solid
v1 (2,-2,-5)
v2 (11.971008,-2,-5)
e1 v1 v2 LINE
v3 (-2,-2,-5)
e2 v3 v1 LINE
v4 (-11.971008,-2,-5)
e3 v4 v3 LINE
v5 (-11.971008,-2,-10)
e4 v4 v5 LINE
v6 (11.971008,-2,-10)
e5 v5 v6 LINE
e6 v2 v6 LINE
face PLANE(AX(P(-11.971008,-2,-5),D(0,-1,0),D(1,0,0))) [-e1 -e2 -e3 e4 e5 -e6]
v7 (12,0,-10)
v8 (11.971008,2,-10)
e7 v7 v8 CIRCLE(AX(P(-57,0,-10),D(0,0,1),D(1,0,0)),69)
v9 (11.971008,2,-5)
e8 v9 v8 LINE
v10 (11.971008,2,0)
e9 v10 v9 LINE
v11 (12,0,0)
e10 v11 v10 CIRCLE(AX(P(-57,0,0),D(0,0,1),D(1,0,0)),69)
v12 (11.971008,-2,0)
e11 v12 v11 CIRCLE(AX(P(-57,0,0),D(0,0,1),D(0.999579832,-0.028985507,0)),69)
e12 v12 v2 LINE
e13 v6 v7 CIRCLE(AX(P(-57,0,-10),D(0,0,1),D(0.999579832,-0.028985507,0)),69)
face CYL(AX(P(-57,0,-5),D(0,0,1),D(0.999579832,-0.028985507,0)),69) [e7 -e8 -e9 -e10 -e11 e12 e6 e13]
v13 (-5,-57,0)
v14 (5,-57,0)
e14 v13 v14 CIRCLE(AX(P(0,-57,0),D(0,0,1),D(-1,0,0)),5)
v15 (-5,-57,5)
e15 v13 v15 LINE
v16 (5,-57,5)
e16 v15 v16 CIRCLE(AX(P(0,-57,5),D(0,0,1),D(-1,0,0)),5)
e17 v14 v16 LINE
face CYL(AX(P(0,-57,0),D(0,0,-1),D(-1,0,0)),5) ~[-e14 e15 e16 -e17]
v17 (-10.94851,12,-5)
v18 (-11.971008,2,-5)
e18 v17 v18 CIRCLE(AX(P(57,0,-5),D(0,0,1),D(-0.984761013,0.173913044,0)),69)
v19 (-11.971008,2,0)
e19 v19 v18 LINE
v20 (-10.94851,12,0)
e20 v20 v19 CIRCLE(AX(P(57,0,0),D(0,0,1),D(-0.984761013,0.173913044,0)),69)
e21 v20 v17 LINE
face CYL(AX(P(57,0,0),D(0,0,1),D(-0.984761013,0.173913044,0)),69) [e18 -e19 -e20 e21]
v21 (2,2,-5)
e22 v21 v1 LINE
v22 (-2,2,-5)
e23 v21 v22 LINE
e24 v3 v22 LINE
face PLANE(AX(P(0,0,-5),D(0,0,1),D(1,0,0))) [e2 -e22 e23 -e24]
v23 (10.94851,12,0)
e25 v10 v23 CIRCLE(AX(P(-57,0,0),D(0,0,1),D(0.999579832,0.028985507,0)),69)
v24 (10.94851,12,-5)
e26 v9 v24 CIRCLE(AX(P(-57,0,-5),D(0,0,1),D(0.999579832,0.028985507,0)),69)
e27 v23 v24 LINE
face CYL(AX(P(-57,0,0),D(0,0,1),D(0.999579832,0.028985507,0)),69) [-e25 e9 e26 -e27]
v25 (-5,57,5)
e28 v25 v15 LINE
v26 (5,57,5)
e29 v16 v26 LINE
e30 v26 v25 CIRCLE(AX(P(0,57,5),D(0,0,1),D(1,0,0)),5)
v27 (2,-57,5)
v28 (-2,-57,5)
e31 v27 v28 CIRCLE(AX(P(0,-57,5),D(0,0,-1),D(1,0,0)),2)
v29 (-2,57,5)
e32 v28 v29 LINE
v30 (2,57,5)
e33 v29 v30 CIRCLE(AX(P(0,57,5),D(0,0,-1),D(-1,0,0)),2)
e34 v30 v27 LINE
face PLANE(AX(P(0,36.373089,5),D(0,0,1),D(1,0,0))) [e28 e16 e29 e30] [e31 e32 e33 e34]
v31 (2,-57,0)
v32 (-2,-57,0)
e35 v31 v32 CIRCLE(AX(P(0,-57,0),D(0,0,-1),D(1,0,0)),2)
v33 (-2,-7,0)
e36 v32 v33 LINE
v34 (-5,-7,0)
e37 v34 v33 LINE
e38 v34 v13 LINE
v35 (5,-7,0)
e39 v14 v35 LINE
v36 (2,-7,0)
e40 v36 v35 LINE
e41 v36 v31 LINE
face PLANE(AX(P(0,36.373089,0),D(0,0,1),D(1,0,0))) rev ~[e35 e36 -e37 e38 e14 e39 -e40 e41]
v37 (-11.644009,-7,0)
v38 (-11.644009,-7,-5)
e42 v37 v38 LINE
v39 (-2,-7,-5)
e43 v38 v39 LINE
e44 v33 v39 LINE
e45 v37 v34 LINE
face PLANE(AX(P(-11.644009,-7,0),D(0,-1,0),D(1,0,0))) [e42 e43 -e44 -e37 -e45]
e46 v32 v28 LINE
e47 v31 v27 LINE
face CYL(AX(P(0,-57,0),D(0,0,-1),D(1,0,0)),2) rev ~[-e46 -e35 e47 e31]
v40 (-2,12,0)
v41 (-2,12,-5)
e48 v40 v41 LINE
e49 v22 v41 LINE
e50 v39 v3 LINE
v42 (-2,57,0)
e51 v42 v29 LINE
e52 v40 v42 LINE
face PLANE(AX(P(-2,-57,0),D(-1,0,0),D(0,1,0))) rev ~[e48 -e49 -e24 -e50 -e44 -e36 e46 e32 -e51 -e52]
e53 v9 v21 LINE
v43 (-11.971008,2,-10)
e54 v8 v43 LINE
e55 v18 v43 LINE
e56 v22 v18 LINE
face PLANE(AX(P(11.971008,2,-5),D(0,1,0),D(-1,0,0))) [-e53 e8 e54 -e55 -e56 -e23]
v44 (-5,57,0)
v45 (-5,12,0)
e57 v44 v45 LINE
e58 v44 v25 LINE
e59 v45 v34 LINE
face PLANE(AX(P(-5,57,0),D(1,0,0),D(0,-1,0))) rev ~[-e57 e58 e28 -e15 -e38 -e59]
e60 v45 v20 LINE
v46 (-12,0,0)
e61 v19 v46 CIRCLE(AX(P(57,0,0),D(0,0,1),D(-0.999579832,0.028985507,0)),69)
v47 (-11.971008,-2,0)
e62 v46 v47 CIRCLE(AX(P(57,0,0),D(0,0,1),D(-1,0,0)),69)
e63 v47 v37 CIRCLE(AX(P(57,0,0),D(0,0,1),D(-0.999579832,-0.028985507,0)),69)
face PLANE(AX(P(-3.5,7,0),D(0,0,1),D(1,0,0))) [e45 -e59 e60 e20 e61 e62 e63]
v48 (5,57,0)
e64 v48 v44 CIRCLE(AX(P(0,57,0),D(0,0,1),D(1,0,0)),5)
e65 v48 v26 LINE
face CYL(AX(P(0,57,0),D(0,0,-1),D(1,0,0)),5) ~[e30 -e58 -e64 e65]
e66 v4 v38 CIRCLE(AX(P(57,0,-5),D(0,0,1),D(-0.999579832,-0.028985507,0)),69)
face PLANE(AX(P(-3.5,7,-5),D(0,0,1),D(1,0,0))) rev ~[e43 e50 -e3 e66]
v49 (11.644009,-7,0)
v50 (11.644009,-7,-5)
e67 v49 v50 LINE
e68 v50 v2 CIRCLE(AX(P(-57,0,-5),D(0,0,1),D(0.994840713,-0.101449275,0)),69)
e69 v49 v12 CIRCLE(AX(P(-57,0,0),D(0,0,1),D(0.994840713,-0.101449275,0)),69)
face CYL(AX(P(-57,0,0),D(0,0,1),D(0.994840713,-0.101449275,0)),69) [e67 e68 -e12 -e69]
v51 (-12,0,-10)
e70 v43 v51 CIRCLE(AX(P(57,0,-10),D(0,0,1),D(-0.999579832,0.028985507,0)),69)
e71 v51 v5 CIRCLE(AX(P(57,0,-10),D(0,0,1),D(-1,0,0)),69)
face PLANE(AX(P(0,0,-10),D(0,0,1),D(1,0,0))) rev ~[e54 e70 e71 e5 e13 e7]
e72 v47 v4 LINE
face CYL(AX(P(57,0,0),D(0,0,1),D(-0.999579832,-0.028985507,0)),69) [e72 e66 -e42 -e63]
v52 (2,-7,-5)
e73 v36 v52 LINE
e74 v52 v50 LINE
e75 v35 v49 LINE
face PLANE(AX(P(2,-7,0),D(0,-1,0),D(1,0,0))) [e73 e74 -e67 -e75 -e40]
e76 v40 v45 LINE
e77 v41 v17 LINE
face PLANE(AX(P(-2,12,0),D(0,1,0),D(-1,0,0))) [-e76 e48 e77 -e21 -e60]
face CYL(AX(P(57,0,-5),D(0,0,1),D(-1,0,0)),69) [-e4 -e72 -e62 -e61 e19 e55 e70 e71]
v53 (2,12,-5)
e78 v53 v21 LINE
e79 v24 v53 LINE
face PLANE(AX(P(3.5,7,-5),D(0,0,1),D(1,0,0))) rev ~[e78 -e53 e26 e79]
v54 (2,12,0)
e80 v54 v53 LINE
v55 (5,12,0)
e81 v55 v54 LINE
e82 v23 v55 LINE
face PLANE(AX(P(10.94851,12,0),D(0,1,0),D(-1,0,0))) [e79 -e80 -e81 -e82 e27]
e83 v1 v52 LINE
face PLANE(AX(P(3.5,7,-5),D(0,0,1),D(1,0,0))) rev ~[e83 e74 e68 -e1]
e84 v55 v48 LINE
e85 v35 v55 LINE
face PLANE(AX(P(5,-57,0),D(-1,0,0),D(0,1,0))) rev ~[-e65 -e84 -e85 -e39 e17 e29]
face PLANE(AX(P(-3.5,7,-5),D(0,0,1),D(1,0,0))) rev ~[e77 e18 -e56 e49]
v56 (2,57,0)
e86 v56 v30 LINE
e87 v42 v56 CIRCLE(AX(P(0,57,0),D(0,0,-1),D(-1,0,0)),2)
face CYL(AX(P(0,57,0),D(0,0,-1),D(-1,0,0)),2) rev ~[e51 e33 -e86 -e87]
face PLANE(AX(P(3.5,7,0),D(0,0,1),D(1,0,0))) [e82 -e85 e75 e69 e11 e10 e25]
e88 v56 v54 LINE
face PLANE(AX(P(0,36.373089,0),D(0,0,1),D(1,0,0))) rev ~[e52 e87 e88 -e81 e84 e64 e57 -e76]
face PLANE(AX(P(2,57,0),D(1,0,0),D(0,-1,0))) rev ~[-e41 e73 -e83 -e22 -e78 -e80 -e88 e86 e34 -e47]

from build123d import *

# Parameters (mm, degrees)
F0_W     = 3
F0_H     = 10
F0_H_2   = 5
F1_DEPTH = 5
F2_START = -5
F2_DEPTH = 5
F3_DEPTH = 5


with BuildPart() as f1:
    # F0 (on Top) → F1 (new body)
    with BuildSketch(Plane.XY):
        with Locations((3.5, 7)):
            Rectangle(F0_W, F0_H)
        with BuildLine():
            Line((10.9485099174, 12), (5, 12))
            Line((5, 12), (5, 2))
            Line((5, 2), (11.9710084021, 2))
            ThreePointArc((11.9710084021, 2), (11.6421053306, 7.0186448683), (10.9485099174, 12))
        make_face()
        Polygon((5, 2), (2, 2), (2, -2), (5, -2), (5, 0), align=None)
        with BuildLine():
            Line((11.9710084021, 2), (5, 2))
            Line((5, 2), (5, 0))
            Line((5, 0), (5, -2))
            Line((5, -2), (11.9710084021, -2))
            ThreePointArc((11.9710084021, -2), (11.9927517198, -1.0001050586), (12, 0))
            ThreePointArc((12, 0), (11.9927517198, 1.0001050586), (11.9710084021, 2))
        make_face()
        with Locations((3.5, -4.5)):
            Rectangle(F0_W, F0_H_2)
        with BuildLine():
            Line((11.9710084021, -2), (5, -2))
            Line((5, -2), (5, -7))
            Line((5, -7), (11.6440092069, -7))
            ThreePointArc((11.6440092069, -7), (11.8529103806, -4.5029692558), (11.9710084021, -2))
        make_face()
    extrude(amount=-F1_DEPTH)



with BuildPart() as f1b:
    # F0 (on Top) → F1, piece 2 (new body)
    with BuildSketch(Plane.XY):
        with Locations((-3.5, 7)):
            Rectangle(F0_W, F0_H)
        with BuildLine():
            Line((-5, 2), (-5, 12))
            Line((-5, 12), (-10.9485099174, 12))
            ThreePointArc((-10.9485099174, 12), (-11.6421053306, 7.0186448683), (-11.9710084021, 2))
            Line((-11.9710084021, 2), (-5, 2))
        make_face()
        Polygon((-2, -2), (-2, 2), (-5, 2), (-5, 0), (-5, -2), align=None)
        with BuildLine():
            Line((-5, 0), (-5, 2))
            Line((-5, 2), (-11.9710084021, 2))
            ThreePointArc((-11.9710084021, 2), (-11.9927517198, 1.0001050586), (-12, 0))
            ThreePointArc((-12, 0), (-11.9927517198, -1.0001050586), (-11.9710084021, -2))
            Line((-11.9710084021, -2), (-5, -2))
            Line((-5, -2), (-5, 0))
        make_face()
        with Locations((-3.5, -4.5)):
            Rectangle(F0_W, F0_H_2)
        with BuildLine():
            Line((-5, -7), (-5, -2))
            Line((-5, -2), (-11.9710084021, -2))
            ThreePointArc((-11.9710084021, -2), (-11.8529103806, -4.5029692558), (-11.6440092069, -7))
            Line((-11.6440092069, -7), (-5, -7))
        make_face()
    extrude(amount=-F1_DEPTH)


with BuildPart() as f1_1:
    add(f1.part)

    add(f1b.part)  # F2 merges F1b
    # F0 (on Top) → F2 (join)
    with BuildSketch(Plane.XY.offset(F2_START)):
        Polygon((2, -2), (2, 2), (0, 2), (-2, 2), (-2, -2), (0, -2), align=None)
        Polygon((5, 2), (2, 2), (2, -2), (5, -2), (5, 0), align=None)
        Polygon((-2, -2), (-2, 2), (-5, 2), (-5, 0), (-5, -2), align=None)
        with BuildLine():
            Line((11.9710084021, 2), (5, 2))
            Line((5, 2), (5, 0))
            Line((5, 0), (5, -2))
            Line((5, -2), (11.9710084021, -2))
            ThreePointArc((11.9710084021, -2), (11.9927517198, -1.0001050586), (12, 0))
            ThreePointArc((12, 0), (11.9927517198, 1.0001050586), (11.9710084021, 2))
        make_face()
        with BuildLine():
            Line((-5, 0), (-5, 2))
            Line((-5, 2), (-11.9710084021, 2))
            ThreePointArc((-11.9710084021, 2), (-11.9927517198, 1.0001050586), (-12, 0))
            ThreePointArc((-12, 0), (-11.9927517198, -1.0001050586), (-11.9710084021, -2))
            Line((-11.9710084021, -2), (-5, -2))
            Line((-5, -2), (-5, 0))
        make_face()
    extrude(amount=-F2_DEPTH)

    # F0 (on Top) → F3 (join)
    with BuildSketch(Plane.XY):
        with BuildLine():
            ThreePointArc((-2, 57), (0, 59), (2, 57))
            Line((2, 57), (2, 12))
            Line((2, 12), (5, 12))
            Line((5, 12), (5, 57))
            ThreePointArc((5, 57), (0, 62), (-5, 57))
            Line((-5, 57), (-5, 12))
            Line((-5, 12), (-2, 12))
            Line((-2, 12), (-2, 57))
        make_face()
        with Locations((3.5, 7)):
            Rectangle(F0_W, F0_H)
        with Locations((-3.5, 7)):
            Rectangle(F0_W, F0_H)
        Polygon((5, 2), (2, 2), (2, -2), (5, -2), (5, 0), align=None)
        Polygon((-2, -2), (-2, 2), (-5, 2), (-5, 0), (-5, -2), align=None)
        with Locations((3.5, -4.5)):
            Rectangle(F0_W, F0_H_2)
        with Locations((-3.5, -4.5)):
            Rectangle(F0_W, F0_H_2)
        with BuildLine():
            Line((5, -7), (2, -7))
            Line((2, -7), (2, -57))
            ThreePointArc((2, -57), (0, -59), (-2, -57))
            Line((-2, -57), (-2, -7))
            Line((-2, -7), (-5, -7))
            Line((-5, -7), (-5, -57))
            ThreePointArc((-5, -57), (0, -62), (5, -57))
            Line((5, -57), (5, -7))
        make_face()
    extrude(amount=F3_DEPTH)


solid = f1_1.part
